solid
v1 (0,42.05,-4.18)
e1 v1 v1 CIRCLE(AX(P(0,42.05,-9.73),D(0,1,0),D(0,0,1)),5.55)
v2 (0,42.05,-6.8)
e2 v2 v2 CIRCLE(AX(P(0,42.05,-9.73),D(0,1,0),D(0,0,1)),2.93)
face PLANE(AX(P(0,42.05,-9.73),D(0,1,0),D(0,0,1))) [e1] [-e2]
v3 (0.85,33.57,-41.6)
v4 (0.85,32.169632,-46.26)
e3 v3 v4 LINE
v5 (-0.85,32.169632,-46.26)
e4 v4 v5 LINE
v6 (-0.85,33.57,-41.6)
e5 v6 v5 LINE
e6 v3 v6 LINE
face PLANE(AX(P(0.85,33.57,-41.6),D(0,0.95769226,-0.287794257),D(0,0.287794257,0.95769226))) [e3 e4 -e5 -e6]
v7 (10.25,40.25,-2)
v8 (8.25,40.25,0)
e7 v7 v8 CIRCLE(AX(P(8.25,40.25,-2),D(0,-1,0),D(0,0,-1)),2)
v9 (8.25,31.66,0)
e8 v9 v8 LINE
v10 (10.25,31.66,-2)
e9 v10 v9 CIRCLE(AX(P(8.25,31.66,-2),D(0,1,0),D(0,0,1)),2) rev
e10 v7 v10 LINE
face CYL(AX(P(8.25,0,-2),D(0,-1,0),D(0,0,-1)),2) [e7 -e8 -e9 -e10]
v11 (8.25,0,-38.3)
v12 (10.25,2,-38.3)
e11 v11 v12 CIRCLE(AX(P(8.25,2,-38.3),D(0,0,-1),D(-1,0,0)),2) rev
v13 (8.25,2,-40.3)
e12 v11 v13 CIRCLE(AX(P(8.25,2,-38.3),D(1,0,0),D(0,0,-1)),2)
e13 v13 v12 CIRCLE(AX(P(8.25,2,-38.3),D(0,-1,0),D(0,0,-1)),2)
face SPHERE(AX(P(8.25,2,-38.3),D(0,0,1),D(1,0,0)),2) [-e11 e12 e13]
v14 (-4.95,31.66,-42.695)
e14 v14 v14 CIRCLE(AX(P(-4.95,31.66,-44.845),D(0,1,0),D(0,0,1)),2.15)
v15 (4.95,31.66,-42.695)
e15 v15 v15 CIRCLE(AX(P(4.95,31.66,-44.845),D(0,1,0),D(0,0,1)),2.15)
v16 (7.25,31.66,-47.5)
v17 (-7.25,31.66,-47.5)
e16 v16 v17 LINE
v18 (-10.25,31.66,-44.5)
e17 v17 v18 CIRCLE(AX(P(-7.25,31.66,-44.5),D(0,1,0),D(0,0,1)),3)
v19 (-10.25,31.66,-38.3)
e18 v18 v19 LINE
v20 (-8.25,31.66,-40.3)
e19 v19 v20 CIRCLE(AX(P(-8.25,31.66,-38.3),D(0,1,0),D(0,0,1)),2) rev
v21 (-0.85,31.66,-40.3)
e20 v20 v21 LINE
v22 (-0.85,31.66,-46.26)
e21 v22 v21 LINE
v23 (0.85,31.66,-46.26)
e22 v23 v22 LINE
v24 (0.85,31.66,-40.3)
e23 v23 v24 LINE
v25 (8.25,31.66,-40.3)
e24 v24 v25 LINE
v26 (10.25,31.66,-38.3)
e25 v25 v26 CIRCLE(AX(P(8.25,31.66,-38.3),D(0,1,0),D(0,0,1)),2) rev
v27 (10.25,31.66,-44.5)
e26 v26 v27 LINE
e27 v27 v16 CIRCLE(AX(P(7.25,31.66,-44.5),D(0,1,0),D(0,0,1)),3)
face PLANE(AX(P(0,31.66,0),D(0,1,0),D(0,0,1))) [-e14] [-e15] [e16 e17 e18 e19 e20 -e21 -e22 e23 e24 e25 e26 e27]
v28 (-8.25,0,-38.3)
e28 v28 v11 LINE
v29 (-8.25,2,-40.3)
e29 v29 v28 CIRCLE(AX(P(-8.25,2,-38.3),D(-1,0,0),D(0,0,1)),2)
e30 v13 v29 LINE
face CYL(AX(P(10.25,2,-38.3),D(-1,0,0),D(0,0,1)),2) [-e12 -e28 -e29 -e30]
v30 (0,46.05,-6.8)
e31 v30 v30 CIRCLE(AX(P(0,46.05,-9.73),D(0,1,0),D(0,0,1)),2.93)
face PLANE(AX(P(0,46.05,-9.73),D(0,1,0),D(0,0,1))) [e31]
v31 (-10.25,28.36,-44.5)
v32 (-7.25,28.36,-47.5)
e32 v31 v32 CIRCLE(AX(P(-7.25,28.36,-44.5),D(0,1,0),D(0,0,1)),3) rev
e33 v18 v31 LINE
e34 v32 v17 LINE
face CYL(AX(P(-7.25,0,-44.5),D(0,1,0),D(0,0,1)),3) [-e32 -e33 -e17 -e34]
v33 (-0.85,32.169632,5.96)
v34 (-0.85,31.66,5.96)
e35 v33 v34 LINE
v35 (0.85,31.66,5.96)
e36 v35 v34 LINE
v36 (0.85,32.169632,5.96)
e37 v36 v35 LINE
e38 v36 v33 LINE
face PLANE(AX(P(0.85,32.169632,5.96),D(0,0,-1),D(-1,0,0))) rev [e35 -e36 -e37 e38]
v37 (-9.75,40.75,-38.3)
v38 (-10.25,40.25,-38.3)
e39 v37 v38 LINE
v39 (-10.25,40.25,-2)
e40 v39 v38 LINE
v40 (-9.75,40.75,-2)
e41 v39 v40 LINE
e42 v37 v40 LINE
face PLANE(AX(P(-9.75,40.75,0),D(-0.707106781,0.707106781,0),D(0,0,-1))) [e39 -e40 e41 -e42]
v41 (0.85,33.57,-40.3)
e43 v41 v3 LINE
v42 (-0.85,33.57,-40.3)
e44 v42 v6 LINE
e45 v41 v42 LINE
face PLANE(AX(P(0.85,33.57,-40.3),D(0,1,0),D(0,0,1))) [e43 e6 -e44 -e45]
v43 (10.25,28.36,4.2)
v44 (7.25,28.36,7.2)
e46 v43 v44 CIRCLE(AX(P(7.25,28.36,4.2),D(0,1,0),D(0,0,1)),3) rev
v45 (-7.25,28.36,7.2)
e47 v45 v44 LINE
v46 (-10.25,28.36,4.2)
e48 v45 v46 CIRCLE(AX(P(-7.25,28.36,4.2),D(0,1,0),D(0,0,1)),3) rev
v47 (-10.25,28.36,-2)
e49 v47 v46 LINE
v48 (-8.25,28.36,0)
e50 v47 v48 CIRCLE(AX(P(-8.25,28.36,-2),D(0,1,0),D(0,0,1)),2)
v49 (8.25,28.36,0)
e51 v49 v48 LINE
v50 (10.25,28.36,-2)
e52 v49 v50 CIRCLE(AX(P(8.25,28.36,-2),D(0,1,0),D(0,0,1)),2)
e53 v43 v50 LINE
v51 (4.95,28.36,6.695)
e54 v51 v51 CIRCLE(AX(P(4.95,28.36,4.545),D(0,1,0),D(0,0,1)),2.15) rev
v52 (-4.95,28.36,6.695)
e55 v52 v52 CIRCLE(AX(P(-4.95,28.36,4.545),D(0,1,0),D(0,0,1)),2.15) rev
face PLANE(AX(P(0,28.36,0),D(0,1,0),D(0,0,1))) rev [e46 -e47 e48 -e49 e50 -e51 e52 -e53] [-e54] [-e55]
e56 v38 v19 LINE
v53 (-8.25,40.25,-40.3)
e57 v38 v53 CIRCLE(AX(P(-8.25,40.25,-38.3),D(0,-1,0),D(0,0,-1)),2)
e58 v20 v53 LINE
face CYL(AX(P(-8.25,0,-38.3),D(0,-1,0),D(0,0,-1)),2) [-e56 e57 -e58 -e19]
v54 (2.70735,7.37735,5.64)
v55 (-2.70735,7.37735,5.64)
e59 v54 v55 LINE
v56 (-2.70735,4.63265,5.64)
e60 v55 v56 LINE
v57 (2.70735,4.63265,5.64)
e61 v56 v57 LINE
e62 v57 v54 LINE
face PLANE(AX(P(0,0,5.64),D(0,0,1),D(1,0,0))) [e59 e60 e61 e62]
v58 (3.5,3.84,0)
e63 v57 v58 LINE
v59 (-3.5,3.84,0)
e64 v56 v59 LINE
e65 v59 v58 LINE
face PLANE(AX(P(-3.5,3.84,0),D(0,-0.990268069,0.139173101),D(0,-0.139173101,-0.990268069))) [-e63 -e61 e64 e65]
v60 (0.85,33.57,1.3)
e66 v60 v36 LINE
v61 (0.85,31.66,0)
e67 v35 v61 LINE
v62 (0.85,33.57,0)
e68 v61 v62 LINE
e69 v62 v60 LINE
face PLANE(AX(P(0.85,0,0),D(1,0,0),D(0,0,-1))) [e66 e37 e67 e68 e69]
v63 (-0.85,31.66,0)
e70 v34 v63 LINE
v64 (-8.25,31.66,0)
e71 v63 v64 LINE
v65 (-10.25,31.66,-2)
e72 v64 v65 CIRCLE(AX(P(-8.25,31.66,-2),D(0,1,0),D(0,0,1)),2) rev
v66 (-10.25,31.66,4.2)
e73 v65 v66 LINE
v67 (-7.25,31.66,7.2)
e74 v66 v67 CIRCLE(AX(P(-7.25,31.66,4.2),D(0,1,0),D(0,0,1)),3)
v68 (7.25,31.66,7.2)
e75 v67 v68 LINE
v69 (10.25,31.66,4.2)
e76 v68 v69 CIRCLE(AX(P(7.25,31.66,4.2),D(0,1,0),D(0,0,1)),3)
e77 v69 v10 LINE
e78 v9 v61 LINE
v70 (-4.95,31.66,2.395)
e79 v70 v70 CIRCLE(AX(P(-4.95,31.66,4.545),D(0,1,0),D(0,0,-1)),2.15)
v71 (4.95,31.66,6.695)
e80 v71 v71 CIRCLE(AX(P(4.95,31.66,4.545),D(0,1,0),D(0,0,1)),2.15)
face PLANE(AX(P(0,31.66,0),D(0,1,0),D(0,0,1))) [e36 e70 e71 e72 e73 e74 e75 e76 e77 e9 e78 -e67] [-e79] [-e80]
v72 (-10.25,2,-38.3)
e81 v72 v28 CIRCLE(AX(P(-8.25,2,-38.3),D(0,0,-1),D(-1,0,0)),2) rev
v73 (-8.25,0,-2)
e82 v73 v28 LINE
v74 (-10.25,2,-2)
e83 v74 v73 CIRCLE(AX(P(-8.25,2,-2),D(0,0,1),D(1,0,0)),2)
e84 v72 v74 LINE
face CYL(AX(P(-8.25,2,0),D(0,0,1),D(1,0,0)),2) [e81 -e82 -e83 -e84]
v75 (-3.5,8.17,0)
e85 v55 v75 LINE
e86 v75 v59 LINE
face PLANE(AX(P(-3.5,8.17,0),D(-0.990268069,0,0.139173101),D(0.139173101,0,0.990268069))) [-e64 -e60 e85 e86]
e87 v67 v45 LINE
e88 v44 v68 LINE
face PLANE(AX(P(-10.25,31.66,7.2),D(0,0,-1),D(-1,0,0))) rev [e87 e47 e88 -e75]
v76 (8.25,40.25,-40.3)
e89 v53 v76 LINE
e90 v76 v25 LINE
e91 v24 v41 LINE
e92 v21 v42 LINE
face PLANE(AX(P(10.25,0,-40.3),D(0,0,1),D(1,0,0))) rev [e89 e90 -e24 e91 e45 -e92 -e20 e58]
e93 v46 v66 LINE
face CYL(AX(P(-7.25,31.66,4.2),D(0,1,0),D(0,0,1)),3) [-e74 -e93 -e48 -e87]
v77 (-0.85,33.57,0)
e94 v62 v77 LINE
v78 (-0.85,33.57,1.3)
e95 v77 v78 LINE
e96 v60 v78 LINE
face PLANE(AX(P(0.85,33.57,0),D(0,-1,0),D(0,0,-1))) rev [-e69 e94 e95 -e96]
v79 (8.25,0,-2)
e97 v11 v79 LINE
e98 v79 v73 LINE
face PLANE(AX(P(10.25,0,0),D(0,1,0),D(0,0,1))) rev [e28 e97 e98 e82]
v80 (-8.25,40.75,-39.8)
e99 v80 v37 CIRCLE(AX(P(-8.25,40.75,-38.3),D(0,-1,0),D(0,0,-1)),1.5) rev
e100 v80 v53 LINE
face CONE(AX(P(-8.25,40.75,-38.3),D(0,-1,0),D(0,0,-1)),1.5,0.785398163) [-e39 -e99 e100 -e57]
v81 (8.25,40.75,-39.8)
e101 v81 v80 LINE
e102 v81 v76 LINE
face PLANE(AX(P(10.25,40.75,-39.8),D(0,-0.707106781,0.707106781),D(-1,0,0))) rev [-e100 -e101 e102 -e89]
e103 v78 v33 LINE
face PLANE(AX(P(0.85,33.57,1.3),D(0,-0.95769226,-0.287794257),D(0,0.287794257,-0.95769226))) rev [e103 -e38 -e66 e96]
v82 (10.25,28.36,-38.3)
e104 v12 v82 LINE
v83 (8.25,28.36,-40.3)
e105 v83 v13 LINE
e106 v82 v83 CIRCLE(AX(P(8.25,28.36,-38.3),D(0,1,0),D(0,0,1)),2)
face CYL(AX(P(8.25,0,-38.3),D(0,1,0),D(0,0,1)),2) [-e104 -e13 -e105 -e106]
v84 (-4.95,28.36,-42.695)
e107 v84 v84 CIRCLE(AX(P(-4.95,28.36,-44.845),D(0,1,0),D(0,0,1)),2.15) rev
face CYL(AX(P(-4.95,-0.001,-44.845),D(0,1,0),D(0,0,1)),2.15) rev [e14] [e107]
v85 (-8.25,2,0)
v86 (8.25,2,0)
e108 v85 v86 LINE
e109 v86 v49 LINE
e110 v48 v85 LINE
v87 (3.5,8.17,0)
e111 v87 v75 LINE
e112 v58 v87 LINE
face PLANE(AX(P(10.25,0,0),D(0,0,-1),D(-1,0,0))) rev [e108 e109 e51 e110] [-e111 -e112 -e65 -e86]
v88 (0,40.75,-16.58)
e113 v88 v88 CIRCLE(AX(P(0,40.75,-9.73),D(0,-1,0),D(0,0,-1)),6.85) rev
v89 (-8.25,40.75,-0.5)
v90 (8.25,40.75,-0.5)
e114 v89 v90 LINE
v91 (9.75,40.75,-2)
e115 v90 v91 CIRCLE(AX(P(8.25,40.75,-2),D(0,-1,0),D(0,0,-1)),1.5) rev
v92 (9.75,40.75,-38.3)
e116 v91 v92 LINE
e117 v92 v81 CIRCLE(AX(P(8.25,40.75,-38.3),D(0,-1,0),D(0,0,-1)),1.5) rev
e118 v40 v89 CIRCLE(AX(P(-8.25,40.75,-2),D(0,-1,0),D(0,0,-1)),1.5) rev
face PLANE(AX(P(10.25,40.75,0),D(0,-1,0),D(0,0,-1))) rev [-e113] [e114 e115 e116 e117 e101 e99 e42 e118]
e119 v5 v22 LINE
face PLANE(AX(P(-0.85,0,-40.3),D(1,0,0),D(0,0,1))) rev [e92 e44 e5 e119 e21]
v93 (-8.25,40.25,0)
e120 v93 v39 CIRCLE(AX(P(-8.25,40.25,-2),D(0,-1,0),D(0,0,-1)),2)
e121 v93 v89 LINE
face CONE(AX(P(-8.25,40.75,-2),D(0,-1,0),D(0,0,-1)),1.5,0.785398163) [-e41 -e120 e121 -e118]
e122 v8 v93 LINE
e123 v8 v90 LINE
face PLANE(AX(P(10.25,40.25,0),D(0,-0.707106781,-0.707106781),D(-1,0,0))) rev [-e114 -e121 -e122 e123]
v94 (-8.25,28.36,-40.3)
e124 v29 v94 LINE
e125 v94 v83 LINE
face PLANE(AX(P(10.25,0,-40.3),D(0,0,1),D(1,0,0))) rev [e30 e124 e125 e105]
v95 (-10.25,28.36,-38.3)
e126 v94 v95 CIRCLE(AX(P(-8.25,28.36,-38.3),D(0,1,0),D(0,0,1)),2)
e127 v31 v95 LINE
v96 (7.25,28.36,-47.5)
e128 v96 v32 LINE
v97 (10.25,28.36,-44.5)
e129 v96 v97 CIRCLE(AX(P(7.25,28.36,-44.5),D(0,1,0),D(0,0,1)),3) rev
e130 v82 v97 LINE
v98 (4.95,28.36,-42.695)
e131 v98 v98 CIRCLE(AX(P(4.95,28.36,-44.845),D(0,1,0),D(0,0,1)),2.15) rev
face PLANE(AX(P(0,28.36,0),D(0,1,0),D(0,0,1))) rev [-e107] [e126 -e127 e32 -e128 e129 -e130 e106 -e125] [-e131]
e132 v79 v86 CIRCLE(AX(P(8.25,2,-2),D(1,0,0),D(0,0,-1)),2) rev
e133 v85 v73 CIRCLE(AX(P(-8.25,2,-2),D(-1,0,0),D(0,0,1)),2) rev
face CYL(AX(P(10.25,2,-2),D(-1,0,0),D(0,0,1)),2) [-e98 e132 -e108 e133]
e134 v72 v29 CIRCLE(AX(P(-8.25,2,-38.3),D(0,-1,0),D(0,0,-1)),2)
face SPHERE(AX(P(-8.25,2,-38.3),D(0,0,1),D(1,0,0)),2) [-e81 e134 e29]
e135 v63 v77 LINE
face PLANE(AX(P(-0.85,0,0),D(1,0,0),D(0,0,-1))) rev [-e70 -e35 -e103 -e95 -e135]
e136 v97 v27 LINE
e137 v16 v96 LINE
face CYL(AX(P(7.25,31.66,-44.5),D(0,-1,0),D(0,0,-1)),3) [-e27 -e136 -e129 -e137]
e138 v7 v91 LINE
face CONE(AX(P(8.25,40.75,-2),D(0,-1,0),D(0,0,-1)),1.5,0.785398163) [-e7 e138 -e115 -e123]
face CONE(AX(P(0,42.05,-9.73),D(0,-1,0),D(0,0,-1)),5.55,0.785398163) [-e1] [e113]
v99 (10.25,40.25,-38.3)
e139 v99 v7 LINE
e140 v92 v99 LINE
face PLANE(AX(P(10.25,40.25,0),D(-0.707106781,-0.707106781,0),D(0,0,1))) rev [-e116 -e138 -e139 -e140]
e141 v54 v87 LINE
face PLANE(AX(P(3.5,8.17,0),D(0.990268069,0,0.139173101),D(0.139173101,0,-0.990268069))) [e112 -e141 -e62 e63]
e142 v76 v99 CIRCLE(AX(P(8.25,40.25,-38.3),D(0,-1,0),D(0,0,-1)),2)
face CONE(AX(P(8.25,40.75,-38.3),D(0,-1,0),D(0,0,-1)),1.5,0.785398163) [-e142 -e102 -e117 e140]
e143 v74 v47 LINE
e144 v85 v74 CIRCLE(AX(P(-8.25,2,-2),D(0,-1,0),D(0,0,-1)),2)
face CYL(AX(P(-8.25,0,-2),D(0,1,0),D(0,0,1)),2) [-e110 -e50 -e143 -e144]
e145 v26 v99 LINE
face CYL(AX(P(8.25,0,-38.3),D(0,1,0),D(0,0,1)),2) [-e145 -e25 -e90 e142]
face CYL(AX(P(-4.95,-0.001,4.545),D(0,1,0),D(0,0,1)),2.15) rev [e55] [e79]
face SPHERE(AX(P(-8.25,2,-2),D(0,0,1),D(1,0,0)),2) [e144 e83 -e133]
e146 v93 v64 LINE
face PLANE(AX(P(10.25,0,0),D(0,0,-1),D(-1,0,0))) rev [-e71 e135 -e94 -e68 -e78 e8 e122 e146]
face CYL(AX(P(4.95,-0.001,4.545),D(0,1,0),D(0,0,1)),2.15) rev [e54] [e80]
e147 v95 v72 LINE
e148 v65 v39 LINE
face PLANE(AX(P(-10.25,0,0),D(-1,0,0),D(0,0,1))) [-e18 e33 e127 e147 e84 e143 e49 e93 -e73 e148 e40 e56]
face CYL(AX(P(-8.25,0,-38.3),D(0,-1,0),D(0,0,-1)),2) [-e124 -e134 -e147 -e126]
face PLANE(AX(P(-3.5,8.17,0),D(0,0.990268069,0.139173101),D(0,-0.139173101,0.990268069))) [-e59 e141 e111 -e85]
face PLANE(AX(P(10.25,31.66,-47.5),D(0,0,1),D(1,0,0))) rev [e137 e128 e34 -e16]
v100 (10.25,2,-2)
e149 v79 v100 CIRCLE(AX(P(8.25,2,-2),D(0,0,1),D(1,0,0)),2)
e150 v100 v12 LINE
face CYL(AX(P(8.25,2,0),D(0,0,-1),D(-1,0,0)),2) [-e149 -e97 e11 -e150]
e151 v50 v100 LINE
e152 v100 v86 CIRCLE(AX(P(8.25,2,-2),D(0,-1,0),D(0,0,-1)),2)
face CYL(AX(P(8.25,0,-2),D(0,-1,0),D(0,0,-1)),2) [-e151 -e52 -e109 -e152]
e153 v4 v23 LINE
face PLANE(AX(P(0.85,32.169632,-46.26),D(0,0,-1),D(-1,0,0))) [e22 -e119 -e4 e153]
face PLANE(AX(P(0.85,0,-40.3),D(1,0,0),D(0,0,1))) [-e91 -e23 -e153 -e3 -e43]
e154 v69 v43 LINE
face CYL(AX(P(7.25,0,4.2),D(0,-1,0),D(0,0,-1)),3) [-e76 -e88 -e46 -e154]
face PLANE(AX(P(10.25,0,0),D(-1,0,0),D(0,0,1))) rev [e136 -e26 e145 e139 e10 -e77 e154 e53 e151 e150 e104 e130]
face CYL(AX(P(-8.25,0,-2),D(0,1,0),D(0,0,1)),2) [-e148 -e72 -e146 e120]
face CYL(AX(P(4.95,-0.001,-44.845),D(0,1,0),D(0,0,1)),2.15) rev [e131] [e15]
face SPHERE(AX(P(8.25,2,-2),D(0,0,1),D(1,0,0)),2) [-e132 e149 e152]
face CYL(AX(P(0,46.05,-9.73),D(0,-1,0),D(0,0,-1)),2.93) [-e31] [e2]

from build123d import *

# Parameters (mm, degrees)
SKETCH1_W           = 40.3
SKETCH1_H           = 40.75
BOSS_EXTRUDE1_DEPTH = 10.25
SKETCH2_R           = 2.93
BOSS_EXTRUDE2_DEPTH = 5.3
SKETCH3_R           = 6.85
BOSS_EXTRUDE3_DEPTH = 1.3
CHAMFER1_SIZE       = 1.3
BOSS_EXTRUDE4_START = 28.36
SKETCH4_W           = 20.5
SKETCH4_H           = 7.2
BOSS_EXTRUDE4_DEPTH = 3.3
CUT_EXTRUDE1_REACH  = 59.997
SKETCH5_R           = 2.15
FILLET1_R           = 2
FILLET2_R           = 3
BOSS_EXTRUDE5_DEPTH = 0.85
CHAMFER2_SIZE       = 0.5
SKETCH8_W           = 7
SKETCH8_H           = 4.33
BOSS_EXTRUDE6_DEPTH = 5.64
BOSS_EXTRUDE6_TAPER = 8


with BuildPart() as part:
    # Sketch1 → Boss-Extrude1 (new, symmetric)
    with BuildSketch(Plane(origin=(0, 0, 0), x_dir=(0, 0, -1), z_dir=(1, 0, 0))):
        with Locations((20.15, 20.375)):
            Rectangle(SKETCH1_W, SKETCH1_H)
    extrude(amount=BOSS_EXTRUDE1_DEPTH, both=True)

    # Sketch2 → Boss-Extrude2 (add)
    with BuildSketch(Plane(origin=(0, 40.75, 0), x_dir=(1, 0, 0), z_dir=(0, 1, 0))):
        with Locations(Location((0, 9.73, 0), (0, 0, 90))):
            Circle(SKETCH2_R)
    extrude(amount=BOSS_EXTRUDE2_DEPTH)

    # Sketch3 → Boss-Extrude3 (add)
    with BuildSketch(Plane(origin=(0, 40.75, 0), x_dir=(1, 0, 0), z_dir=(0, 1, 0))):
        with Locations(Location((0, 9.73, 0), (0, 0, 90))):
            Circle(SKETCH3_R)
    extrude(amount=BOSS_EXTRUDE3_DEPTH)

    # Chamfer1
    chamfer1_edges = [part.edges().sort_by_distance(p)[0] for p in [
        (0, 42.05, -2.88),
    ]]
    chamfer(chamfer1_edges, length=CHAMFER1_SIZE - 0.0001)  # a hair under: the kernel refuses the full size

    # Sketch4 → Boss-Extrude4 (add)
    with BuildSketch(Plane(origin=(0, 0, 0), x_dir=(1, 0, 0), z_dir=(0, 1, 0)).offset(BOSS_EXTRUDE4_START)):
        with Locations((0, -3.6)):
            Rectangle(SKETCH4_W, SKETCH4_H)
        with Locations((0, 43.9)):
            Rectangle(SKETCH4_W, SKETCH4_H)
    extrude(amount=BOSS_EXTRUDE4_DEPTH)

    # Sketch5 → Cut-Extrude1 (cut, up to next)
    with BuildSketch(Plane(origin=(0, 31.66, 0), x_dir=(1, 0, 0), z_dir=(0, 1, 0)), mode=Mode.PRIVATE) as cut_extrude1_sk1:
        with Locations(Location((4.95, -4.545, 0), (0, 0, 270))):
            Circle(SKETCH5_R)
    cut_extrude1_tool1 = extrude(cut_extrude1_sk1.sketch, amount=-CUT_EXTRUDE1_REACH, mode=Mode.PRIVATE) & part.part
    # Sketch5 → Cut-Extrude1 (cut, up to next)
    with BuildSketch(Plane(origin=(0, 31.66, 0), x_dir=(1, 0, 0), z_dir=(0, 1, 0)), mode=Mode.PRIVATE) as cut_extrude1_sk2:
        with Locations(Location((-4.95, -4.545, 0), (0, 0, 270))):
            Circle(SKETCH5_R)
    cut_extrude1_tool2 = extrude(cut_extrude1_sk2.sketch, amount=-CUT_EXTRUDE1_REACH, mode=Mode.PRIVATE) & part.part
    # Sketch5 → Cut-Extrude1 (cut, up to next)
    with BuildSketch(Plane(origin=(0, 31.66, 0), x_dir=(1, 0, 0), z_dir=(0, 1, 0)), mode=Mode.PRIVATE) as cut_extrude1_sk3:
        with Locations(Location((4.95, 44.845, 0), (0, 0, 270))):
            Circle(SKETCH5_R)
    cut_extrude1_tool3 = extrude(cut_extrude1_sk3.sketch, amount=-CUT_EXTRUDE1_REACH, mode=Mode.PRIVATE) & part.part
    # Sketch5 → Cut-Extrude1 (cut, up to next)
    with BuildSketch(Plane(origin=(0, 31.66, 0), x_dir=(1, 0, 0), z_dir=(0, 1, 0)), mode=Mode.PRIVATE) as cut_extrude1_sk4:
        with Locations(Location((-4.95, 44.845, 0), (0, 0, 270))):
            Circle(SKETCH5_R)
    cut_extrude1_tool4 = extrude(cut_extrude1_sk4.sketch, amount=-CUT_EXTRUDE1_REACH, mode=Mode.PRIVATE) & part.part
    add(cut_extrude1_tool1.solids().sort_by_distance((4.95, 31.66, 4.545))[0], mode=Mode.SUBTRACT)
    add(cut_extrude1_tool2.solids().sort_by_distance((-4.95, 31.66, 4.545))[0], mode=Mode.SUBTRACT)
    add(cut_extrude1_tool3.solids().sort_by_distance((4.95, 31.66, -44.845))[0], mode=Mode.SUBTRACT)
    add(cut_extrude1_tool4.solids().sort_by_distance((-4.95, 31.66, -44.845))[0], mode=Mode.SUBTRACT)

    # Fillet1
    fillet1_edges = [part.edges().sort_by_distance(p)[0] for p in [
        (10.25, 14.18, -40.3),
        (-10.25, 14.18, 0),
        (10.25, 14.18, 0),
        (-10.25, 36.205, -40.3),
        (10.25, 36.205, -40.3),
        (10.25, 36.205, 0),
        (-10.25, 14.18, -40.3),
        (-10.25, 0, -20.15),
        (-10.25, 36.205, 0),
        (0, 0, -40.3),
        (0, 0, 0),
        (10.25, 0, -20.15),
    ]]
    fillet(fillet1_edges, radius=FILLET1_R)

    # Fillet2
    fillet2_edges = [part.edges().sort_by_distance(p)[0] for p in [
        (-10.25, 30.01, 7.2),
        (10.25, 30.01, 7.2),
        (10.25, 30.01, -47.5),
        (-10.25, 30.01, -47.5),
    ]]
    fillet(fillet2_edges, radius=FILLET2_R)

    # Sketch7 → Boss-Extrude5 (add, symmetric)
    with BuildSketch(Plane(origin=(0, 0, 0), x_dir=(0, 0, -1), z_dir=(1, 0, 0))):
        Polygon((0, 31.66), (0, 33.57), (-1.3, 33.57), (-5.96, 32.169632375), (-5.96, 31.66), align=None)
    boss_extrude5 = extrude(amount=BOSS_EXTRUDE5_DEPTH, both=True)

    # Mirror1: Boss-Extrude5 across plane
    add(boss_extrude5.mirror(Plane.XY.offset(-20.15)))

    # Chamfer2
    chamfer2_edges = [part.edges().sort_by_distance(p)[0] for p in [
        (10.25, 40.75, -20.15),
        (-10.25, 40.75, -20.15),
        (0, 40.75, 0),
        (0, 40.75, -40.3),
        (9.664213562, 40.75, -39.714213562),
        (-9.664213562, 40.75, -39.714213562),
        (9.664213562, 40.75, -0.585786438),
        (-9.664213562, 40.75, -0.585786438),
    ]]
    chamfer(chamfer2_edges, length=CHAMFER2_SIZE)

    # Sketch8 → Boss-Extrude6 (add)
    with BuildSketch(Plane.XY):
        with Locations((0, 6.005)):
            Rectangle(SKETCH8_W, SKETCH8_H)
    extrude(amount=BOSS_EXTRUDE6_DEPTH, taper=BOSS_EXTRUDE6_TAPER)


solid = part.part
